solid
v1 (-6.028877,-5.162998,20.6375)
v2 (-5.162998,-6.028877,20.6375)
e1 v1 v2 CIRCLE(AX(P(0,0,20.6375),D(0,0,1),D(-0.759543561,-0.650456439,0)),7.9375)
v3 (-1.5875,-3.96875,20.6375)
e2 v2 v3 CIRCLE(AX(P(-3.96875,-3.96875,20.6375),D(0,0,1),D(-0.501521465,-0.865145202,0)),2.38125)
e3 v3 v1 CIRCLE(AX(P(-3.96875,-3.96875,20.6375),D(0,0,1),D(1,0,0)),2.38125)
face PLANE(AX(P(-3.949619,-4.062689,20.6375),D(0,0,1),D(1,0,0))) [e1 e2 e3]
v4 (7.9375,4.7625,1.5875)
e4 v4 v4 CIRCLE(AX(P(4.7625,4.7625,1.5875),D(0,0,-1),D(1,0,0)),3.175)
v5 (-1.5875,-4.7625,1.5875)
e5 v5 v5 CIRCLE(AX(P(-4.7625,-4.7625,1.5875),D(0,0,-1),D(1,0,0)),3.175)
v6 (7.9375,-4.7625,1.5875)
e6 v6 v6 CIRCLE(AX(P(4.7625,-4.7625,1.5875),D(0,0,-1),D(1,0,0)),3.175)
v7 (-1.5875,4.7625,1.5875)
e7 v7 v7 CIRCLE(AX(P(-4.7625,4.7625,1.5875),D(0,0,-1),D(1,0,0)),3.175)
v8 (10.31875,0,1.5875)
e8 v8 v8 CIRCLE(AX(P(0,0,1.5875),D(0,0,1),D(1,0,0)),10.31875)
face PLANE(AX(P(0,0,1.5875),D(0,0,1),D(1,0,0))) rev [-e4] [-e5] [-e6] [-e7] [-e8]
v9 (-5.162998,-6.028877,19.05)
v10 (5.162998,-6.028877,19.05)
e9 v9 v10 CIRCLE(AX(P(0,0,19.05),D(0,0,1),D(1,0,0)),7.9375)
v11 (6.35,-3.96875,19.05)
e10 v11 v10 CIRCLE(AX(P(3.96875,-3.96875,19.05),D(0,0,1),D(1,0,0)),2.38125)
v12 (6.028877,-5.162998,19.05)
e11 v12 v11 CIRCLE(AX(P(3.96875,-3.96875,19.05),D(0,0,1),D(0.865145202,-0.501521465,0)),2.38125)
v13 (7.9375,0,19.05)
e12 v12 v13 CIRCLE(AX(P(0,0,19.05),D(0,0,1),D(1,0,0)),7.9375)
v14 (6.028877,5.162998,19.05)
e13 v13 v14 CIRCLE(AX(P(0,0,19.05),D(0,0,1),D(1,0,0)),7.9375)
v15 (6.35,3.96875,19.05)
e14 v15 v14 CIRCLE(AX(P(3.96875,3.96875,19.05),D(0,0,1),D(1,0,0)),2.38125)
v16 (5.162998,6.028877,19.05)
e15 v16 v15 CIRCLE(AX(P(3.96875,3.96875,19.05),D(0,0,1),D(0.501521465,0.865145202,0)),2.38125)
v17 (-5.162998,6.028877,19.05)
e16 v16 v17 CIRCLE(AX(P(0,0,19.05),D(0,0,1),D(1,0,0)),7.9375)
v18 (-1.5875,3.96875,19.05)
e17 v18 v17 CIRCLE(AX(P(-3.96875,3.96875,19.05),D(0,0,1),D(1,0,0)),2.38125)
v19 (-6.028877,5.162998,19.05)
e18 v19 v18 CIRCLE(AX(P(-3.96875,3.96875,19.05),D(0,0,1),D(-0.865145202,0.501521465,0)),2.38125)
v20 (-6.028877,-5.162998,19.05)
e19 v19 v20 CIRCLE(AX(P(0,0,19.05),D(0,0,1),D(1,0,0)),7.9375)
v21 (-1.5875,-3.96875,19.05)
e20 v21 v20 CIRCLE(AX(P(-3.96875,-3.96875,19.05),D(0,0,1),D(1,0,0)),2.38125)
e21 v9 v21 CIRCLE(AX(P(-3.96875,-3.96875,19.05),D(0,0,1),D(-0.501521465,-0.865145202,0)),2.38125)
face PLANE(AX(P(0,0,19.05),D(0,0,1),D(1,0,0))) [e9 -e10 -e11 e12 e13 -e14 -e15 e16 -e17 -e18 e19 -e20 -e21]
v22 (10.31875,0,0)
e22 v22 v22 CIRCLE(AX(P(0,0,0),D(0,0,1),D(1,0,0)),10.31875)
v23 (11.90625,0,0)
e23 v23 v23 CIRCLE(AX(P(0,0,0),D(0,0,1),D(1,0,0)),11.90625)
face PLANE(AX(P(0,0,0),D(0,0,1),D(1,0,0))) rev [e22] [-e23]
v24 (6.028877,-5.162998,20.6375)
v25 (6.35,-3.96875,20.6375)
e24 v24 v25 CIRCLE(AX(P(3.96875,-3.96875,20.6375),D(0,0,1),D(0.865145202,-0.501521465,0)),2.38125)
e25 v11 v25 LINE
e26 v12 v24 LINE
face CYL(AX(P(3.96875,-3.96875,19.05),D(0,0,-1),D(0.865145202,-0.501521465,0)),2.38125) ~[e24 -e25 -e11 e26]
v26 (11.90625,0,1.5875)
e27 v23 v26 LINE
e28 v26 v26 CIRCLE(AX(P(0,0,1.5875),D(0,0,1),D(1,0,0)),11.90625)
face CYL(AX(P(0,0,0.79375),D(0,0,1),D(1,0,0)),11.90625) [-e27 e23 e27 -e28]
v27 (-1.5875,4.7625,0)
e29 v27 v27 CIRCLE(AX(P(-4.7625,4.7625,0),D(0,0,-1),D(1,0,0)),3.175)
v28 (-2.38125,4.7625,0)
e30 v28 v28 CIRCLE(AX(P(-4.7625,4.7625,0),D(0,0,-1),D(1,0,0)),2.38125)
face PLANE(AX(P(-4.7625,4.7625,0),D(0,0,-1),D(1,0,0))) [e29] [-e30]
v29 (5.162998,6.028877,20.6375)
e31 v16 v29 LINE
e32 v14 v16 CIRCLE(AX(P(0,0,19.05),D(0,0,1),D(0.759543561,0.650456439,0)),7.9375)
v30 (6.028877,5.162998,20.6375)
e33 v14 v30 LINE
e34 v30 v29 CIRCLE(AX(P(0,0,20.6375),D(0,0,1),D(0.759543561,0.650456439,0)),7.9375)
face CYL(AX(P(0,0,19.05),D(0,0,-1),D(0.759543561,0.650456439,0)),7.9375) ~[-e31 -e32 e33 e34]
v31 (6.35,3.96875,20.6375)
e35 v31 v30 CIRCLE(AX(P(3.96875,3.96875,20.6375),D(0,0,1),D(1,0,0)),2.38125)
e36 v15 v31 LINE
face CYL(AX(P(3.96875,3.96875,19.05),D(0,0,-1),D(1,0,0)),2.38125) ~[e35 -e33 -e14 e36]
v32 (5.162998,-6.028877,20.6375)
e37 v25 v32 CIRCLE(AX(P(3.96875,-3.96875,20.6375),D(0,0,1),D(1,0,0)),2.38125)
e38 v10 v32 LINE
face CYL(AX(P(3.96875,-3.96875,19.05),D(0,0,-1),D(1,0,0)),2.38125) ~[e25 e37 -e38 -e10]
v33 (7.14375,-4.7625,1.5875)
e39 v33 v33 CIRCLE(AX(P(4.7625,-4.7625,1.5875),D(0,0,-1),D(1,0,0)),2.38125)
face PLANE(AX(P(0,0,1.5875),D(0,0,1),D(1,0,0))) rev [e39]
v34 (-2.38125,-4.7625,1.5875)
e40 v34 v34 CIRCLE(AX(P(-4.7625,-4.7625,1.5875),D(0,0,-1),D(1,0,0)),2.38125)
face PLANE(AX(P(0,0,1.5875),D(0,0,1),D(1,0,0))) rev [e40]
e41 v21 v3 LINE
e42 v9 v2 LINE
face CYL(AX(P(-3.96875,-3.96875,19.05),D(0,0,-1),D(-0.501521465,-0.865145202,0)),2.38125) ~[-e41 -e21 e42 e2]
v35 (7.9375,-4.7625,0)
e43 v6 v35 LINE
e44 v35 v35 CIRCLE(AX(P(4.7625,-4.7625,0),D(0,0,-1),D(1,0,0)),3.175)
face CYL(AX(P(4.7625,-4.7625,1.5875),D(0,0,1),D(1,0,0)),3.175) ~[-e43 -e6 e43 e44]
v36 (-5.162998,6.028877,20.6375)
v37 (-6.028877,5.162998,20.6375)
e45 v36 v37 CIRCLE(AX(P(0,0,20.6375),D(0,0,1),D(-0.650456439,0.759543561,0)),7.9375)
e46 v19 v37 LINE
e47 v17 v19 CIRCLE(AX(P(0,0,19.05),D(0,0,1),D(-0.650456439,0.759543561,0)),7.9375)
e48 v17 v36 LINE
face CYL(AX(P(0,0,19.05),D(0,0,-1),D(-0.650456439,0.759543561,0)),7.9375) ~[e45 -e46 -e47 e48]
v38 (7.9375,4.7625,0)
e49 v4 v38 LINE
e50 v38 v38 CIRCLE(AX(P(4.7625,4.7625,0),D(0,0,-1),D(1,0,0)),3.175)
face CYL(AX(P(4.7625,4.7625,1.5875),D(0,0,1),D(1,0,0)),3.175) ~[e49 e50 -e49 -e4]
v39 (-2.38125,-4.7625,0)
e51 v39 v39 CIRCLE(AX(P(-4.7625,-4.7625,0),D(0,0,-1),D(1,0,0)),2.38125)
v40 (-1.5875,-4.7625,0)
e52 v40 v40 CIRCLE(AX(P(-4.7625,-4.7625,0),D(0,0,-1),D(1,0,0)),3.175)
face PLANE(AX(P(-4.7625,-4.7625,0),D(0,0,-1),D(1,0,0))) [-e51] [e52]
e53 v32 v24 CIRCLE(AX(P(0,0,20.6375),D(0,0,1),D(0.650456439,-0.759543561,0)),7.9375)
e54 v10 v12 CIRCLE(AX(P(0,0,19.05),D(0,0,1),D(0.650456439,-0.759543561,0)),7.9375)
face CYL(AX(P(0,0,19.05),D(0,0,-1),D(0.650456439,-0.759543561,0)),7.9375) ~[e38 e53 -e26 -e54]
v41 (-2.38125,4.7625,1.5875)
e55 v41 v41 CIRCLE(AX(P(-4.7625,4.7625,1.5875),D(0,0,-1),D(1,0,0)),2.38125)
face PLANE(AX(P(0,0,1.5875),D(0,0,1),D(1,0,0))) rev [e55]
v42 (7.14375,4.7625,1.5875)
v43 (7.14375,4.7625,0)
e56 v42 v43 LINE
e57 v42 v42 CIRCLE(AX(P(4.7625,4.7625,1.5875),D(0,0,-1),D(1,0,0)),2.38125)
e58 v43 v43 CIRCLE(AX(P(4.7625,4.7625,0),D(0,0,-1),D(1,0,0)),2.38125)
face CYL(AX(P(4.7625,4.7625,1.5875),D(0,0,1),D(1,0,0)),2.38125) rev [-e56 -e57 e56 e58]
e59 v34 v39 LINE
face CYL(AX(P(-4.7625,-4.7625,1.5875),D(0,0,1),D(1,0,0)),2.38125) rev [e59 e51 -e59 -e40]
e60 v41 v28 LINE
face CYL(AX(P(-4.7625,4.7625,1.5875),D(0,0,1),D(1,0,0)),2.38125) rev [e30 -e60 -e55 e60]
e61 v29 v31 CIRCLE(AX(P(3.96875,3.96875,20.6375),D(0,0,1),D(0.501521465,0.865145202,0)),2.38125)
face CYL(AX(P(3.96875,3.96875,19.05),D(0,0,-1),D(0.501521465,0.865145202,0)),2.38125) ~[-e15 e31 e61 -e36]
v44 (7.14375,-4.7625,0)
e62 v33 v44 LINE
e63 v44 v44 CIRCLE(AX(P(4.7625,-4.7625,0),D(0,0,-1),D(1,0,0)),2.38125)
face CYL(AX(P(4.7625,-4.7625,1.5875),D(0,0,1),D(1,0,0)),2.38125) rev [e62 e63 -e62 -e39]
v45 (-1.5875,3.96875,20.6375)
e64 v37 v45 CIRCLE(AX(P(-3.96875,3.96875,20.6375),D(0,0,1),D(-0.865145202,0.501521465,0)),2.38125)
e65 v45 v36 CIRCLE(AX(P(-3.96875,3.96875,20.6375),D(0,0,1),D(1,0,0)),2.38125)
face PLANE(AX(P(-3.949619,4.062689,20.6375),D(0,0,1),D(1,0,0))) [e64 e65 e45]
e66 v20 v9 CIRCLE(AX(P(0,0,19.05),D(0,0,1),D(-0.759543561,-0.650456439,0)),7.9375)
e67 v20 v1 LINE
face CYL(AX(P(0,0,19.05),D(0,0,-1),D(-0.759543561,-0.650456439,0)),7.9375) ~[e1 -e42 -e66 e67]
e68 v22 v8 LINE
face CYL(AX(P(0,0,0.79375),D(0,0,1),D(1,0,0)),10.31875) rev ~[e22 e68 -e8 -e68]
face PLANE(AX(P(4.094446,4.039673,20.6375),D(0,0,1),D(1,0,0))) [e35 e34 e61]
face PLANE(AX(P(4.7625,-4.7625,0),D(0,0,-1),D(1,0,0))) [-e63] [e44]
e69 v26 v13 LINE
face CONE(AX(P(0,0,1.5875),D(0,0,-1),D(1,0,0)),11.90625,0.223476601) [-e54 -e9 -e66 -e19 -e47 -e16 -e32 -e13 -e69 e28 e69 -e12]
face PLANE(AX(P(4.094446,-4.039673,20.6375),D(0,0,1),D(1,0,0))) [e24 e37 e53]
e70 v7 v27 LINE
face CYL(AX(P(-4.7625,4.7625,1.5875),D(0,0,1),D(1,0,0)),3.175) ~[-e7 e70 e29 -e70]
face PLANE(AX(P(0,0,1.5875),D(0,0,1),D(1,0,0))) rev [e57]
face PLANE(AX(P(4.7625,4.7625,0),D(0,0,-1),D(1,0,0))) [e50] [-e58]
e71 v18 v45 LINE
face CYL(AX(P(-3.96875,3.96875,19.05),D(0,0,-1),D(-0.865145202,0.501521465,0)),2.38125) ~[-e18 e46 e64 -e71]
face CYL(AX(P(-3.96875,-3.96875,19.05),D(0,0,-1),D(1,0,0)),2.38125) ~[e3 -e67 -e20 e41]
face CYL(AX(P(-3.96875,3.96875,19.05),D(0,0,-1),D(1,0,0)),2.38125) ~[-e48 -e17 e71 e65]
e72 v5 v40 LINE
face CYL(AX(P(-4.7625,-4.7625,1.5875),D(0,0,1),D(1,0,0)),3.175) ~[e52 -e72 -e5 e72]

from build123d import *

# Parameters (mm, degrees)
F0_W     = 1.5875
F0_H     = 1.5875
F3_DEPTH = 1.5875
F4_R     = 3.175
F4_R_2   = 2.38125
F5_DEPTH = 1.5875


with BuildPart() as f1:
    # F0 (on Front) → F1 (revolve)
    with BuildSketch(Plane.XZ):
        with Locations((11.1125, 0.79375)):
            Rectangle(F0_W, F0_H)
        Polygon((0, 19.05), (0, 1.5875), (10.31875, 1.5875), (11.90625, 1.5875), (7.9375, 19.05), align=None)
    revolve(axis=Axis((0, 0, 9.525), (0, 0, 1)))

    # F2 (on face) → F3 (join)
    with BuildSketch(Plane.XY.offset(19.05)):
        with BuildLine():
            ThreePointArc((6.028877012, 5.162997988), (5.6126600757, 5.6126600757), (5.162997988, 6.028877012))
            ThreePointArc((5.162997988, 6.028877012), (1.9054814058, 2.7799378741), (6.35, 3.96875))
            ThreePointArc((6.35, 3.96875), (6.2683183301, 4.5870840986), (6.028877012, 5.162997988))
        make_face()
        with BuildLine():
            ThreePointArc((-1.5875, 3.96875), (-2.7799378741, 6.0320185942), (-5.162997988, 6.028877012))
            ThreePointArc((-5.162997988, 6.028877012), (-5.6126600757, 5.6126600757), (-6.028877012, 5.162997988))
            ThreePointArc((-6.028877012, 5.162997988), (-4.5870840986, 1.6691816699), (-1.5875, 3.96875))
        make_face()
        with BuildLine():
            ThreePointArc((-6.028877012, -5.162997988), (-5.6126600757, -5.6126600757), (-5.162997988, -6.028877012))
            ThreePointArc((-5.162997988, -6.028877012), (-2.7799378741, -6.0320185942), (-1.5875, -3.96875))
            ThreePointArc((-1.5875, -3.96875), (-4.5870840986, -1.6691816699), (-6.028877012, -5.162997988))
        make_face()
        with BuildLine():
            ThreePointArc((6.35, -3.96875), (1.9054814058, -2.7799378741), (5.162997988, -6.028877012))
            ThreePointArc((5.162997988, -6.028877012), (5.6126600757, -5.6126600757), (6.028877012, -5.162997988))
            ThreePointArc((6.028877012, -5.162997988), (6.2683183301, -4.5870840986), (6.35, -3.96875))
        make_face()
    extrude(amount=F3_DEPTH)

    # F4 (on face) → F5 (join)
    with BuildSketch(Plane(origin=(0, 0, 1.5875), x_dir=(1, 0, 0), z_dir=(0, 0, -1))):
        with Locations((-4.7625, -4.7625)):
            Circle(F4_R)
        with Locations((-4.7625, -4.7625)):
            Circle(F4_R_2, mode=Mode.SUBTRACT)
        with Locations((-4.7625, 4.7625)):
            Circle(F4_R)
        with Locations((-4.7625, 4.7625)):
            Circle(F4_R_2, mode=Mode.SUBTRACT)
        with Locations((4.7625, -4.7625)):
            Circle(F4_R)
        with Locations((4.7625, -4.7625)):
            Circle(F4_R_2, mode=Mode.SUBTRACT)
        with Locations((4.7625, 4.7625)):
            Circle(F4_R)
        with Locations((4.7625, 4.7625)):
            Circle(F4_R_2, mode=Mode.SUBTRACT)
    extrude(amount=F5_DEPTH)


solid = f1.part
